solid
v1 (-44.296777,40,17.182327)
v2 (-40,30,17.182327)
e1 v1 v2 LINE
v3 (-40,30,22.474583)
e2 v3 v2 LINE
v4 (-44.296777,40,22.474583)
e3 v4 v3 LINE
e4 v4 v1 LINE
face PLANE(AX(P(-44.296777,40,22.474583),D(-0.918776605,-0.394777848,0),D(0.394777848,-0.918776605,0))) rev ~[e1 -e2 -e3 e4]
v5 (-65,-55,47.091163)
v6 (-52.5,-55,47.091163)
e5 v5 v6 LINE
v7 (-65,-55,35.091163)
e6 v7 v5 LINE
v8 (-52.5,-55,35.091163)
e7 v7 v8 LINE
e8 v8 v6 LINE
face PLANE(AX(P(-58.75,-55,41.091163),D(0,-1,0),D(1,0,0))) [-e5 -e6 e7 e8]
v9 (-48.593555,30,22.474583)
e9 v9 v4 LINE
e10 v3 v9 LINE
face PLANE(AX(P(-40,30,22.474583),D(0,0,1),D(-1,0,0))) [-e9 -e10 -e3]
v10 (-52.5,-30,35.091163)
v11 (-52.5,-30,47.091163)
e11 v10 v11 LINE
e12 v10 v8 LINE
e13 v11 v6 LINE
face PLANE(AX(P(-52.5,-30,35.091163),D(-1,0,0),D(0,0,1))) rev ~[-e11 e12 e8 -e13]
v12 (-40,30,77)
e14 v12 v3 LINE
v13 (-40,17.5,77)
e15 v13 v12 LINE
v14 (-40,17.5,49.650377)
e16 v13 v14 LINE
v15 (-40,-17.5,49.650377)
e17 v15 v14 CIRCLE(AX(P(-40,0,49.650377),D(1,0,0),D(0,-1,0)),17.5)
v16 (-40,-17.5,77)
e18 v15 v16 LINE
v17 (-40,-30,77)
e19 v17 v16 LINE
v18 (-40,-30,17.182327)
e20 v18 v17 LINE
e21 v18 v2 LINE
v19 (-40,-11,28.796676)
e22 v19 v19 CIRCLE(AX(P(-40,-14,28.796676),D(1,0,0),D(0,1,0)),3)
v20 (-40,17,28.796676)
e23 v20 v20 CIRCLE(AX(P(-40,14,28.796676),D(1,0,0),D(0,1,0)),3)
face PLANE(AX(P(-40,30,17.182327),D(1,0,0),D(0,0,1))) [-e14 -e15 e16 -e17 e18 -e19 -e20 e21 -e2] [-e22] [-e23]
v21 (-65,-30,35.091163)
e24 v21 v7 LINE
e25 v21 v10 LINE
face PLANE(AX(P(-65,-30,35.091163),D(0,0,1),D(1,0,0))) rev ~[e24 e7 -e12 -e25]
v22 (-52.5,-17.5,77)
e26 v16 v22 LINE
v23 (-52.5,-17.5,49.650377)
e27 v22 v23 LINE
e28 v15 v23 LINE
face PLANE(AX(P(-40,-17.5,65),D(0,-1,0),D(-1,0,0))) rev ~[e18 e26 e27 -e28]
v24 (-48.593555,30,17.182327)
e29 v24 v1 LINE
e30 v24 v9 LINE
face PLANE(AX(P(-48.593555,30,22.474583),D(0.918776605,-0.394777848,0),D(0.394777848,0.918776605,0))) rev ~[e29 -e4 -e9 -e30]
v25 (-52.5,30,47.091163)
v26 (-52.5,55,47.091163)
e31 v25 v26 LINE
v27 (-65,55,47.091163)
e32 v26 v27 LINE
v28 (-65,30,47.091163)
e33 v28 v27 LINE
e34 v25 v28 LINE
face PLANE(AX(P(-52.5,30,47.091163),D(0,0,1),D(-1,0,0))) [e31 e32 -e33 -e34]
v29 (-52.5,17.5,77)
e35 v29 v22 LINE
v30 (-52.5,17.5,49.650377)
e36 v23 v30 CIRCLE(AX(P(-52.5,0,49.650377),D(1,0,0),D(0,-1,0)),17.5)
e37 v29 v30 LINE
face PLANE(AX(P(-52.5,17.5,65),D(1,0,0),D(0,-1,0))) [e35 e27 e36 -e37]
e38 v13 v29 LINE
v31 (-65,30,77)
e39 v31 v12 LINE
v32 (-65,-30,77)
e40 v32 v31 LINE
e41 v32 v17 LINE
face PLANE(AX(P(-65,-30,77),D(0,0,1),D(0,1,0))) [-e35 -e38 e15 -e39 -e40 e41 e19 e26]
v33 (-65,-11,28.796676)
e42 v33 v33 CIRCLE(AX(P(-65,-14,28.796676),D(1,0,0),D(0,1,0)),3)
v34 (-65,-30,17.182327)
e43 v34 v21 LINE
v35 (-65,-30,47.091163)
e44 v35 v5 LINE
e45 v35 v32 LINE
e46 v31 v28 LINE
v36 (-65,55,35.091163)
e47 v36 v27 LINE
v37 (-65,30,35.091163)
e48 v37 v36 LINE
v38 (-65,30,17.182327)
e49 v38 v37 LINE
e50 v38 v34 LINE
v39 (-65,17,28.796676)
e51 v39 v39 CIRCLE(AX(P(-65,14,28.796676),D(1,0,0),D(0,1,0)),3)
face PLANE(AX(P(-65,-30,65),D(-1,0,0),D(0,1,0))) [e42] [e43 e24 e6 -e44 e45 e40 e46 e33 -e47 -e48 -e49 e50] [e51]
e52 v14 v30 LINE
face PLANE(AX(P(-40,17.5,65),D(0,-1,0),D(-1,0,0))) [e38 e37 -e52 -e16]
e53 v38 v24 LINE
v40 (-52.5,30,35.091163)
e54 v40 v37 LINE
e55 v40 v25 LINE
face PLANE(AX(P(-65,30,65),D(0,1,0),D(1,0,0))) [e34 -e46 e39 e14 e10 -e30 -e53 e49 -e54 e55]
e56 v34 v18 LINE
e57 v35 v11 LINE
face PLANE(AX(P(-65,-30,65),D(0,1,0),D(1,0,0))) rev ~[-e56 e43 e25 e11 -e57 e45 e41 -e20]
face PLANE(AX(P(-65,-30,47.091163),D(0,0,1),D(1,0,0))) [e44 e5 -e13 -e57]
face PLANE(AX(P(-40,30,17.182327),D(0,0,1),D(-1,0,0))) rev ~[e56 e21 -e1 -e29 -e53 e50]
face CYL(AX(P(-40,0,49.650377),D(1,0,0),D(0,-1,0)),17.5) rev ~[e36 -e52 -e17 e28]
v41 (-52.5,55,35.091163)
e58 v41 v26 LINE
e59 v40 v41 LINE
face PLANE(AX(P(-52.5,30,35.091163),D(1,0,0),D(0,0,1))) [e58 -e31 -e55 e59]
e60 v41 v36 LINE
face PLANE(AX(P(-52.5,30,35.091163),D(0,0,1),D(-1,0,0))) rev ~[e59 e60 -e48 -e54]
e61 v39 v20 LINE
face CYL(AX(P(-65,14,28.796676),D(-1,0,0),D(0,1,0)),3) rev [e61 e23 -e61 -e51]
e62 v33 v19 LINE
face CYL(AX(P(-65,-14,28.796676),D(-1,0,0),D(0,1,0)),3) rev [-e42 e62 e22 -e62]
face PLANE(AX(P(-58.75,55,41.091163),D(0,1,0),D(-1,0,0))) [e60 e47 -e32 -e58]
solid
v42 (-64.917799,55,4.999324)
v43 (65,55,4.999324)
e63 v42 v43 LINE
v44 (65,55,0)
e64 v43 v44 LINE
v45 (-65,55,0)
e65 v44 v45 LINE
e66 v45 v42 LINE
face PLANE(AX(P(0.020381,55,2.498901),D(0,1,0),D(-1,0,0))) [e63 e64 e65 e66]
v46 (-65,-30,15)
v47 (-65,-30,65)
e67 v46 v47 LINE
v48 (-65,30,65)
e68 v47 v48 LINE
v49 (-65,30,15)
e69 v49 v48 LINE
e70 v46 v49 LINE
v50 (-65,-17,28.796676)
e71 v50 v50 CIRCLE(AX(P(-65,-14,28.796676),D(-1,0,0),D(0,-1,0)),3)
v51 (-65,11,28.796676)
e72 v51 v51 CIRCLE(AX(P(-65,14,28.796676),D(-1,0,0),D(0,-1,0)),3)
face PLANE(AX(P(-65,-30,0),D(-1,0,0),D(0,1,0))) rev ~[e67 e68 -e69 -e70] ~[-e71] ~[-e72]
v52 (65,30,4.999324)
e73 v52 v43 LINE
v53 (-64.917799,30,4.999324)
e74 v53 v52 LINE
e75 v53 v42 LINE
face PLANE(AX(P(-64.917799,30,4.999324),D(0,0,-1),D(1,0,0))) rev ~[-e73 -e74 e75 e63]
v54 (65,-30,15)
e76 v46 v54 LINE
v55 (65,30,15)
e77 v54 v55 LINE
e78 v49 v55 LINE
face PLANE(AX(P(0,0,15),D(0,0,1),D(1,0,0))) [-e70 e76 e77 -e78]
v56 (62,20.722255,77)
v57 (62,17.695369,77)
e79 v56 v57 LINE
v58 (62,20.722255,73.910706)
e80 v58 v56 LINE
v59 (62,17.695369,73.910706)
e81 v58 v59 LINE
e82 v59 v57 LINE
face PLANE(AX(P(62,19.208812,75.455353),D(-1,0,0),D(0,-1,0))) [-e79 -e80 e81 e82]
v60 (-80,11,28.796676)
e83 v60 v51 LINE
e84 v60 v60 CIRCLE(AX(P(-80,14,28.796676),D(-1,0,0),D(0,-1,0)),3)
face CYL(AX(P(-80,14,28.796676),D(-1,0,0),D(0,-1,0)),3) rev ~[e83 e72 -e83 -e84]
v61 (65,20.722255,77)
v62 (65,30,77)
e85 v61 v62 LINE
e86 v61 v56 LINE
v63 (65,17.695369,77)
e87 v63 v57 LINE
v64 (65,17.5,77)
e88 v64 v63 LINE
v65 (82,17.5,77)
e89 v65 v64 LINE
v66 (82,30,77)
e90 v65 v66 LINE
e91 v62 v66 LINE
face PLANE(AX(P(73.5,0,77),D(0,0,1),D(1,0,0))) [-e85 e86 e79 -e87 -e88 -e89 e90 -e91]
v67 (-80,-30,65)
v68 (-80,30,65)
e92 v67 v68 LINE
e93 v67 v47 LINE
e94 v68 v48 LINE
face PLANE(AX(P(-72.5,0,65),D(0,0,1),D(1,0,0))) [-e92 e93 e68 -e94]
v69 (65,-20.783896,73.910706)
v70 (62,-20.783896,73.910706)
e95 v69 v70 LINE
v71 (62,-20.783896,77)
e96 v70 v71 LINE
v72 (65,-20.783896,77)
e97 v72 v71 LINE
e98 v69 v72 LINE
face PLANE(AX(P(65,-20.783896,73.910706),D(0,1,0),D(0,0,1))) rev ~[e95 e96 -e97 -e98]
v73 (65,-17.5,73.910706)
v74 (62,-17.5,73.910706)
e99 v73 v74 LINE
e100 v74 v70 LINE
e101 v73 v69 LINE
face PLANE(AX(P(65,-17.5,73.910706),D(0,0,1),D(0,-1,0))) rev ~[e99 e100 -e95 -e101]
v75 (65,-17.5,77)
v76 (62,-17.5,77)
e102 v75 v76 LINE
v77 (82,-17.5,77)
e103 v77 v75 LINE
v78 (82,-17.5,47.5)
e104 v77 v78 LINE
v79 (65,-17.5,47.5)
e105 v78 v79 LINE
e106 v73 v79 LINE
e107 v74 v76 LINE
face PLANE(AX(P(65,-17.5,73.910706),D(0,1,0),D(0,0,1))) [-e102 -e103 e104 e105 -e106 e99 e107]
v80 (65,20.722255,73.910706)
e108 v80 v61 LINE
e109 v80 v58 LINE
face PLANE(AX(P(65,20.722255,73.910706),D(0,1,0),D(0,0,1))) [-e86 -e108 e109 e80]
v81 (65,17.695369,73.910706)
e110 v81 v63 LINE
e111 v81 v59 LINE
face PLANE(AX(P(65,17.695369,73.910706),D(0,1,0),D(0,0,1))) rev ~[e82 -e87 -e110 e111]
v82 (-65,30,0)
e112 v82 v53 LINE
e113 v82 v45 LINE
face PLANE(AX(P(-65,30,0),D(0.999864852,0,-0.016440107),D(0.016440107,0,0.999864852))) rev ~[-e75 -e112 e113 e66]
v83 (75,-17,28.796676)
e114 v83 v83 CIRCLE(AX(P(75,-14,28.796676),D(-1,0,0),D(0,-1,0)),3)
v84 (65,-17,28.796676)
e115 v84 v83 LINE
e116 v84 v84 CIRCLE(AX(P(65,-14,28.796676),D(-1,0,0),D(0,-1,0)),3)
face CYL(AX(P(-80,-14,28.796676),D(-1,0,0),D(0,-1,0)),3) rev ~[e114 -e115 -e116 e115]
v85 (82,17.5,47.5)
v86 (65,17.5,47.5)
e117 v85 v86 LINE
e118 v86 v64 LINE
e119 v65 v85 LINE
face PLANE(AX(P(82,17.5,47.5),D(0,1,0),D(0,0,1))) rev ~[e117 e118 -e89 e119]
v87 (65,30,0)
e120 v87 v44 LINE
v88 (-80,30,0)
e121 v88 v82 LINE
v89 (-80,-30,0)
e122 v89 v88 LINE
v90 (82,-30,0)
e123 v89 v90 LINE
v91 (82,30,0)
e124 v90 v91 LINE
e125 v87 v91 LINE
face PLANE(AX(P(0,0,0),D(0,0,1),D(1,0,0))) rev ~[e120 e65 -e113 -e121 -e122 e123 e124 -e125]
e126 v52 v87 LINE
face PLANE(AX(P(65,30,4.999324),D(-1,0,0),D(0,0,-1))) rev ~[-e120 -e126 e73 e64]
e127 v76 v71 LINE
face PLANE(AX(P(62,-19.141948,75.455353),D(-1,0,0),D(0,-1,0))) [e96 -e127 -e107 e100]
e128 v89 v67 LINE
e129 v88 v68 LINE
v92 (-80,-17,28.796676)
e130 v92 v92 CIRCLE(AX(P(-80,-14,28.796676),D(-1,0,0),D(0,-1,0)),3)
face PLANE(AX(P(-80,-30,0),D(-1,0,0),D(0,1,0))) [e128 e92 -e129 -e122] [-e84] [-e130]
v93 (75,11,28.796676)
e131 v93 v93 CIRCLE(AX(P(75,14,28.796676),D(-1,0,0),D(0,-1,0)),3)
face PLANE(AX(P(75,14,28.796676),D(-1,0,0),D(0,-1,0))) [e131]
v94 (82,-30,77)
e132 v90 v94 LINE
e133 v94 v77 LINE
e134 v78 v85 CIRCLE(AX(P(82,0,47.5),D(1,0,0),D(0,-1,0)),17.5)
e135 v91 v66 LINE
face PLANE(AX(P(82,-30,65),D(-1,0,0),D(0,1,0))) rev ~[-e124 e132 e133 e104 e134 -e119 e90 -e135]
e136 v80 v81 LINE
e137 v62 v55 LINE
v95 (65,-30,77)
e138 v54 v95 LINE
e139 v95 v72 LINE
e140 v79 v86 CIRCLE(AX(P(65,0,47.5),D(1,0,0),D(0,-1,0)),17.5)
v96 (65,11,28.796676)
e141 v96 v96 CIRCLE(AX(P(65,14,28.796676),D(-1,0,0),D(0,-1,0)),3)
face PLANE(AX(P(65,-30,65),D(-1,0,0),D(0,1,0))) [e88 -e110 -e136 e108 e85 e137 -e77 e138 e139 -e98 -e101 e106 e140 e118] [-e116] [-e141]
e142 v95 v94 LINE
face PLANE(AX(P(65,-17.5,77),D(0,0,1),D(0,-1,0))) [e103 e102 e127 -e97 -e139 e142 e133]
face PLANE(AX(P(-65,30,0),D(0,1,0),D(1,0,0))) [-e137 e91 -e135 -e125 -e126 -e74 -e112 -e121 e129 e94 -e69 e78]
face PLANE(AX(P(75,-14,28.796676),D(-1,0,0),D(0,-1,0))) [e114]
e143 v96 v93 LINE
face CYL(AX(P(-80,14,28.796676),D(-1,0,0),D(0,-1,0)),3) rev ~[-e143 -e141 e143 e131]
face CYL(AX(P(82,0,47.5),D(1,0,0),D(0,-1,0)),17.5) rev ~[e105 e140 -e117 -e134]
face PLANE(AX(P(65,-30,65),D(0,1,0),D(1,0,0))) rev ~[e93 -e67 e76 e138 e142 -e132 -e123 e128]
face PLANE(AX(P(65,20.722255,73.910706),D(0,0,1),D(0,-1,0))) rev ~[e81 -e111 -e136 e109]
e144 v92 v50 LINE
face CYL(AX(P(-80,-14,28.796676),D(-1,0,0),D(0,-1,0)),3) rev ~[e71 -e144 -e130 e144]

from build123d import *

# Parameters (mm, degrees)
F0_W      = 15
F0_H      = 60
F1_DEPTH  = 65
F0_W_2    = 17
F0_W_3    = 130
F2_DEPTH  = 15
F4_DEPTH  = 17
F5_R      = 3
F6_DEPTH  = 155
F7_W      = 60
F7_H      = 49.8176734522
F7_R      = 3
F8_DEPTH  = 25
F10_DEPTH = 12.5
F12_W     = 25
F12_H     = 60
F13_DEPTH = 2
F15_DEPTH = 25
F16_W     = 12.5
F16_H     = 12
F17_DEPTH = 25
F18_DEPTH = 25
F19_W     = 12.5
F19_H     = 12
F20_DEPTH = 25
F21_DEPTH = 12
F22_W     = 8.5935546458
F22_H     = 5.2922566906
F23_DEPTH = 10
F25_DEPTH = 10
F26_DEPTH = 12
F27_W     = 3.2838956267
F27_H     = 3.0892942548
F27_W_2   = 3.0268859118
F28_DEPTH = 3


# Not quite as in the source:
# - a feature names something its author has since deleted; it is built from what else it names


with BuildPart() as f1:
    # F0 (on Top) → F1 (new body)
    with BuildSketch(Plane.XY):
        with Locations((-72.5, 0)):
            Rectangle(F0_W, F0_H)
    extrude(amount=F1_DEPTH)



with BuildPart() as f1b:
    # F0 (on Top) → F1, piece 2 (new body)
    with BuildSketch(Plane.XY):
        with Locations((73.5, 0)):
            Rectangle(F0_W_2, F0_H)
    extrude(amount=F1_DEPTH)


with BuildPart() as f1_1:
    add(f1.part)

    add(f1b.part)  # F2 merges F1b
    # F0 (on Top) → F2 (join)
    with BuildSketch(Plane.XY):
        Rectangle(F0_W_3, F0_H)
    extrude(amount=F2_DEPTH)

    # F3 (on face) → F4 (cut)
    with BuildSketch(Plane.YZ.offset(82)):
        with BuildLine():
            ThreePointArc((-17.5, 47.5), (0, 30), (17.5, 47.5))
            ThreePointArc((17.5, 47.5), (0, 65), (-17.5, 47.5))
        make_face()
        with BuildLine():
            Line((-17.5, 65), (-17.5, 47.5))
            ThreePointArc((-17.5, 47.5), (-12.3743686586, 59.8743686829), (3.43e-08, 65))
            Line((3.43e-08, 65), (-17.5, 65))
        make_face()
        with BuildLine():
            ThreePointArc((3.43e-08, 65), (12.3743686829, 59.8743686586), (17.5, 47.5))
            Line((17.5, 47.5), (17.5, 65))
            Line((17.5, 65), (3.43e-08, 65))
        make_face()
    extrude(amount=-F4_DEPTH, mode=Mode.SUBTRACT)

    # F5 (on face) → F6 (cut)
    with BuildSketch(Plane(origin=(-80, 0, 0), x_dir=(0, -1, 0), z_dir=(-1, 0, 0))):
        with Locations((-14, 28.7966762781)):
            Circle(F5_R)
        with Locations((14, 28.7966762781)):
            Circle(F5_R)
    extrude(amount=-F6_DEPTH, mode=Mode.SUBTRACT)

    # F11: union 

    # F14 (on face) → F15 (join)
    with BuildSketch(Plane(origin=(0, 30, 0), x_dir=(-1, 0, 0), z_dir=(0, 1, 0))):
        Polygon((-65, 4.9993242615), (-65, 0), (65, 0), (64.9177994628, 4.9993242615), align=None)
    extrude(amount=F15_DEPTH)

    # F26 (add): faces of the model
    f26_faces = [f1_1.faces().sort_by_distance(p)[0] for p in [
        (73.5, -23.75, 65),
        (73.5, 23.75, 65),
    ]]
    extrude(f26_faces, amount=F26_DEPTH)

    # F27 (on face) → F28 (join)
    with BuildSketch(Plane(origin=(65, 0, 0), x_dir=(0, -1, 0), z_dir=(-1, 0, 0))):
        with Locations((19.1419478133, 75.4553528726)):
            Rectangle(F27_W, F27_H)
        with Locations((-19.2088121548, 75.4553528726)):
            Rectangle(F27_W_2, F27_H)
    extrude(amount=F28_DEPTH)


with BuildPart() as f8:
    # F7 (on face) → F8 (new body)
    with BuildSketch(Plane.YZ.offset(-65)):
        with Locations((0, 40.0911632739)):
            Rectangle(F7_W, F7_H)
        with Locations((-14, 28.7966762781)):
            Circle(F7_R, mode=Mode.SUBTRACT)
        with Locations((14, 28.7966762781)):
            Circle(F7_R, mode=Mode.SUBTRACT)
    extrude(amount=F8_DEPTH)

    # F9 (on face) → F10 (cut)
    with BuildSketch(Plane.YZ.offset(-40)):
        with BuildLine():
            ThreePointArc((-17.5, 49.6503765881), (0, 32.1503765881), (17.5, 49.6503765881))
            ThreePointArc((17.5, 49.6503765881), (15.0554364312, 58.5713537692), (8.4047047011, 65))
            Line((8.4047047011, 65), (-8.4047047011, 65))
            ThreePointArc((-8.4047047011, 65), (-15.0554364312, 58.5713537692), (-17.5, 49.6503765881))
        make_face()
        with BuildLine():
            ThreePointArc((8.4047047011, 65), (15.0554364312, 58.5713537692), (17.5, 49.6503765881))
            Line((17.5, 49.6503765881), (17.5, 65))
            Line((17.5, 65), (8.4047047011, 65))
        make_face()
        with BuildLine():
            Line((-17.5, 65), (-17.5, 49.6503765881))
            ThreePointArc((-17.5, 49.6503765881), (-15.0554364312, 58.5713537692), (-8.4047047011, 65))
            Line((-8.4047047011, 65), (-17.5, 65))
        make_face()
    extrude(amount=-F10_DEPTH, mode=Mode.SUBTRACT)

    # F12 (on face) → F13 (cut)
    with BuildSketch(Plane(origin=(0, 0, 15.1823265478), x_dir=(1, 0, 0), z_dir=(0, 0, -1))):
        with Locations((-52.5, 0)):
            Rectangle(F12_W, F12_H)
    extrude(amount=-F13_DEPTH, mode=Mode.SUBTRACT)

    # F16 (on face) → F17 (join)
    with BuildSketch(Plane.XZ.offset(30)):
        with Locations((-58.75, 41.0911632739)):
            Rectangle(F16_W, F16_H)
    extrude(amount=F17_DEPTH)

    # F19 (on face) → F20 (join)
    with BuildSketch(Plane(origin=(0, 30, 0), x_dir=(-1, 0, 0), z_dir=(0, 1, 0))):
        with Locations((58.75, 41.0911632739)):
            Rectangle(F19_W, F19_H)
    extrude(amount=F20_DEPTH)

    # F21 (add): a face of the model
    f21_faces = [f8.faces().sort_by_distance(p)[0] for p in [
        (-55.0735294118, 0, 65),
    ]]
    extrude(f21_faces, amount=F21_DEPTH)

    # F22 (on face) → F23 (join)
    with BuildSketch(Plane(origin=(0, 30, 0), x_dir=(-1, 0, 0), z_dir=(0, 1, 0))):
        with Locations((44.2967773229, 19.8284548931)):
            Rectangle(F22_W, F22_H)
    extrude(amount=F23_DEPTH)

    # F24 (on face) → F25 (cut)
    with BuildSketch(Plane.XY.offset(22.4745832384)):
        Polygon((-44.2967773229, 40), (-40, 30), (-40, 40), align=None)
        Polygon((-48.5935546458, 30), (-44.2967773229, 40), (-48.5935546458, 40), align=None)
    extrude(amount=-F25_DEPTH, mode=Mode.SUBTRACT)


with BuildPart() as f18:
    # F16 (on face) → F18 (new body)
    with BuildSketch(Plane.XZ.offset(30)):
        with Locations((-58.75, 41.0911632739)):
            Rectangle(F16_W, F16_H)
    extrude(amount=F18_DEPTH)


solid = Compound([f1_1.part, f8.part])
